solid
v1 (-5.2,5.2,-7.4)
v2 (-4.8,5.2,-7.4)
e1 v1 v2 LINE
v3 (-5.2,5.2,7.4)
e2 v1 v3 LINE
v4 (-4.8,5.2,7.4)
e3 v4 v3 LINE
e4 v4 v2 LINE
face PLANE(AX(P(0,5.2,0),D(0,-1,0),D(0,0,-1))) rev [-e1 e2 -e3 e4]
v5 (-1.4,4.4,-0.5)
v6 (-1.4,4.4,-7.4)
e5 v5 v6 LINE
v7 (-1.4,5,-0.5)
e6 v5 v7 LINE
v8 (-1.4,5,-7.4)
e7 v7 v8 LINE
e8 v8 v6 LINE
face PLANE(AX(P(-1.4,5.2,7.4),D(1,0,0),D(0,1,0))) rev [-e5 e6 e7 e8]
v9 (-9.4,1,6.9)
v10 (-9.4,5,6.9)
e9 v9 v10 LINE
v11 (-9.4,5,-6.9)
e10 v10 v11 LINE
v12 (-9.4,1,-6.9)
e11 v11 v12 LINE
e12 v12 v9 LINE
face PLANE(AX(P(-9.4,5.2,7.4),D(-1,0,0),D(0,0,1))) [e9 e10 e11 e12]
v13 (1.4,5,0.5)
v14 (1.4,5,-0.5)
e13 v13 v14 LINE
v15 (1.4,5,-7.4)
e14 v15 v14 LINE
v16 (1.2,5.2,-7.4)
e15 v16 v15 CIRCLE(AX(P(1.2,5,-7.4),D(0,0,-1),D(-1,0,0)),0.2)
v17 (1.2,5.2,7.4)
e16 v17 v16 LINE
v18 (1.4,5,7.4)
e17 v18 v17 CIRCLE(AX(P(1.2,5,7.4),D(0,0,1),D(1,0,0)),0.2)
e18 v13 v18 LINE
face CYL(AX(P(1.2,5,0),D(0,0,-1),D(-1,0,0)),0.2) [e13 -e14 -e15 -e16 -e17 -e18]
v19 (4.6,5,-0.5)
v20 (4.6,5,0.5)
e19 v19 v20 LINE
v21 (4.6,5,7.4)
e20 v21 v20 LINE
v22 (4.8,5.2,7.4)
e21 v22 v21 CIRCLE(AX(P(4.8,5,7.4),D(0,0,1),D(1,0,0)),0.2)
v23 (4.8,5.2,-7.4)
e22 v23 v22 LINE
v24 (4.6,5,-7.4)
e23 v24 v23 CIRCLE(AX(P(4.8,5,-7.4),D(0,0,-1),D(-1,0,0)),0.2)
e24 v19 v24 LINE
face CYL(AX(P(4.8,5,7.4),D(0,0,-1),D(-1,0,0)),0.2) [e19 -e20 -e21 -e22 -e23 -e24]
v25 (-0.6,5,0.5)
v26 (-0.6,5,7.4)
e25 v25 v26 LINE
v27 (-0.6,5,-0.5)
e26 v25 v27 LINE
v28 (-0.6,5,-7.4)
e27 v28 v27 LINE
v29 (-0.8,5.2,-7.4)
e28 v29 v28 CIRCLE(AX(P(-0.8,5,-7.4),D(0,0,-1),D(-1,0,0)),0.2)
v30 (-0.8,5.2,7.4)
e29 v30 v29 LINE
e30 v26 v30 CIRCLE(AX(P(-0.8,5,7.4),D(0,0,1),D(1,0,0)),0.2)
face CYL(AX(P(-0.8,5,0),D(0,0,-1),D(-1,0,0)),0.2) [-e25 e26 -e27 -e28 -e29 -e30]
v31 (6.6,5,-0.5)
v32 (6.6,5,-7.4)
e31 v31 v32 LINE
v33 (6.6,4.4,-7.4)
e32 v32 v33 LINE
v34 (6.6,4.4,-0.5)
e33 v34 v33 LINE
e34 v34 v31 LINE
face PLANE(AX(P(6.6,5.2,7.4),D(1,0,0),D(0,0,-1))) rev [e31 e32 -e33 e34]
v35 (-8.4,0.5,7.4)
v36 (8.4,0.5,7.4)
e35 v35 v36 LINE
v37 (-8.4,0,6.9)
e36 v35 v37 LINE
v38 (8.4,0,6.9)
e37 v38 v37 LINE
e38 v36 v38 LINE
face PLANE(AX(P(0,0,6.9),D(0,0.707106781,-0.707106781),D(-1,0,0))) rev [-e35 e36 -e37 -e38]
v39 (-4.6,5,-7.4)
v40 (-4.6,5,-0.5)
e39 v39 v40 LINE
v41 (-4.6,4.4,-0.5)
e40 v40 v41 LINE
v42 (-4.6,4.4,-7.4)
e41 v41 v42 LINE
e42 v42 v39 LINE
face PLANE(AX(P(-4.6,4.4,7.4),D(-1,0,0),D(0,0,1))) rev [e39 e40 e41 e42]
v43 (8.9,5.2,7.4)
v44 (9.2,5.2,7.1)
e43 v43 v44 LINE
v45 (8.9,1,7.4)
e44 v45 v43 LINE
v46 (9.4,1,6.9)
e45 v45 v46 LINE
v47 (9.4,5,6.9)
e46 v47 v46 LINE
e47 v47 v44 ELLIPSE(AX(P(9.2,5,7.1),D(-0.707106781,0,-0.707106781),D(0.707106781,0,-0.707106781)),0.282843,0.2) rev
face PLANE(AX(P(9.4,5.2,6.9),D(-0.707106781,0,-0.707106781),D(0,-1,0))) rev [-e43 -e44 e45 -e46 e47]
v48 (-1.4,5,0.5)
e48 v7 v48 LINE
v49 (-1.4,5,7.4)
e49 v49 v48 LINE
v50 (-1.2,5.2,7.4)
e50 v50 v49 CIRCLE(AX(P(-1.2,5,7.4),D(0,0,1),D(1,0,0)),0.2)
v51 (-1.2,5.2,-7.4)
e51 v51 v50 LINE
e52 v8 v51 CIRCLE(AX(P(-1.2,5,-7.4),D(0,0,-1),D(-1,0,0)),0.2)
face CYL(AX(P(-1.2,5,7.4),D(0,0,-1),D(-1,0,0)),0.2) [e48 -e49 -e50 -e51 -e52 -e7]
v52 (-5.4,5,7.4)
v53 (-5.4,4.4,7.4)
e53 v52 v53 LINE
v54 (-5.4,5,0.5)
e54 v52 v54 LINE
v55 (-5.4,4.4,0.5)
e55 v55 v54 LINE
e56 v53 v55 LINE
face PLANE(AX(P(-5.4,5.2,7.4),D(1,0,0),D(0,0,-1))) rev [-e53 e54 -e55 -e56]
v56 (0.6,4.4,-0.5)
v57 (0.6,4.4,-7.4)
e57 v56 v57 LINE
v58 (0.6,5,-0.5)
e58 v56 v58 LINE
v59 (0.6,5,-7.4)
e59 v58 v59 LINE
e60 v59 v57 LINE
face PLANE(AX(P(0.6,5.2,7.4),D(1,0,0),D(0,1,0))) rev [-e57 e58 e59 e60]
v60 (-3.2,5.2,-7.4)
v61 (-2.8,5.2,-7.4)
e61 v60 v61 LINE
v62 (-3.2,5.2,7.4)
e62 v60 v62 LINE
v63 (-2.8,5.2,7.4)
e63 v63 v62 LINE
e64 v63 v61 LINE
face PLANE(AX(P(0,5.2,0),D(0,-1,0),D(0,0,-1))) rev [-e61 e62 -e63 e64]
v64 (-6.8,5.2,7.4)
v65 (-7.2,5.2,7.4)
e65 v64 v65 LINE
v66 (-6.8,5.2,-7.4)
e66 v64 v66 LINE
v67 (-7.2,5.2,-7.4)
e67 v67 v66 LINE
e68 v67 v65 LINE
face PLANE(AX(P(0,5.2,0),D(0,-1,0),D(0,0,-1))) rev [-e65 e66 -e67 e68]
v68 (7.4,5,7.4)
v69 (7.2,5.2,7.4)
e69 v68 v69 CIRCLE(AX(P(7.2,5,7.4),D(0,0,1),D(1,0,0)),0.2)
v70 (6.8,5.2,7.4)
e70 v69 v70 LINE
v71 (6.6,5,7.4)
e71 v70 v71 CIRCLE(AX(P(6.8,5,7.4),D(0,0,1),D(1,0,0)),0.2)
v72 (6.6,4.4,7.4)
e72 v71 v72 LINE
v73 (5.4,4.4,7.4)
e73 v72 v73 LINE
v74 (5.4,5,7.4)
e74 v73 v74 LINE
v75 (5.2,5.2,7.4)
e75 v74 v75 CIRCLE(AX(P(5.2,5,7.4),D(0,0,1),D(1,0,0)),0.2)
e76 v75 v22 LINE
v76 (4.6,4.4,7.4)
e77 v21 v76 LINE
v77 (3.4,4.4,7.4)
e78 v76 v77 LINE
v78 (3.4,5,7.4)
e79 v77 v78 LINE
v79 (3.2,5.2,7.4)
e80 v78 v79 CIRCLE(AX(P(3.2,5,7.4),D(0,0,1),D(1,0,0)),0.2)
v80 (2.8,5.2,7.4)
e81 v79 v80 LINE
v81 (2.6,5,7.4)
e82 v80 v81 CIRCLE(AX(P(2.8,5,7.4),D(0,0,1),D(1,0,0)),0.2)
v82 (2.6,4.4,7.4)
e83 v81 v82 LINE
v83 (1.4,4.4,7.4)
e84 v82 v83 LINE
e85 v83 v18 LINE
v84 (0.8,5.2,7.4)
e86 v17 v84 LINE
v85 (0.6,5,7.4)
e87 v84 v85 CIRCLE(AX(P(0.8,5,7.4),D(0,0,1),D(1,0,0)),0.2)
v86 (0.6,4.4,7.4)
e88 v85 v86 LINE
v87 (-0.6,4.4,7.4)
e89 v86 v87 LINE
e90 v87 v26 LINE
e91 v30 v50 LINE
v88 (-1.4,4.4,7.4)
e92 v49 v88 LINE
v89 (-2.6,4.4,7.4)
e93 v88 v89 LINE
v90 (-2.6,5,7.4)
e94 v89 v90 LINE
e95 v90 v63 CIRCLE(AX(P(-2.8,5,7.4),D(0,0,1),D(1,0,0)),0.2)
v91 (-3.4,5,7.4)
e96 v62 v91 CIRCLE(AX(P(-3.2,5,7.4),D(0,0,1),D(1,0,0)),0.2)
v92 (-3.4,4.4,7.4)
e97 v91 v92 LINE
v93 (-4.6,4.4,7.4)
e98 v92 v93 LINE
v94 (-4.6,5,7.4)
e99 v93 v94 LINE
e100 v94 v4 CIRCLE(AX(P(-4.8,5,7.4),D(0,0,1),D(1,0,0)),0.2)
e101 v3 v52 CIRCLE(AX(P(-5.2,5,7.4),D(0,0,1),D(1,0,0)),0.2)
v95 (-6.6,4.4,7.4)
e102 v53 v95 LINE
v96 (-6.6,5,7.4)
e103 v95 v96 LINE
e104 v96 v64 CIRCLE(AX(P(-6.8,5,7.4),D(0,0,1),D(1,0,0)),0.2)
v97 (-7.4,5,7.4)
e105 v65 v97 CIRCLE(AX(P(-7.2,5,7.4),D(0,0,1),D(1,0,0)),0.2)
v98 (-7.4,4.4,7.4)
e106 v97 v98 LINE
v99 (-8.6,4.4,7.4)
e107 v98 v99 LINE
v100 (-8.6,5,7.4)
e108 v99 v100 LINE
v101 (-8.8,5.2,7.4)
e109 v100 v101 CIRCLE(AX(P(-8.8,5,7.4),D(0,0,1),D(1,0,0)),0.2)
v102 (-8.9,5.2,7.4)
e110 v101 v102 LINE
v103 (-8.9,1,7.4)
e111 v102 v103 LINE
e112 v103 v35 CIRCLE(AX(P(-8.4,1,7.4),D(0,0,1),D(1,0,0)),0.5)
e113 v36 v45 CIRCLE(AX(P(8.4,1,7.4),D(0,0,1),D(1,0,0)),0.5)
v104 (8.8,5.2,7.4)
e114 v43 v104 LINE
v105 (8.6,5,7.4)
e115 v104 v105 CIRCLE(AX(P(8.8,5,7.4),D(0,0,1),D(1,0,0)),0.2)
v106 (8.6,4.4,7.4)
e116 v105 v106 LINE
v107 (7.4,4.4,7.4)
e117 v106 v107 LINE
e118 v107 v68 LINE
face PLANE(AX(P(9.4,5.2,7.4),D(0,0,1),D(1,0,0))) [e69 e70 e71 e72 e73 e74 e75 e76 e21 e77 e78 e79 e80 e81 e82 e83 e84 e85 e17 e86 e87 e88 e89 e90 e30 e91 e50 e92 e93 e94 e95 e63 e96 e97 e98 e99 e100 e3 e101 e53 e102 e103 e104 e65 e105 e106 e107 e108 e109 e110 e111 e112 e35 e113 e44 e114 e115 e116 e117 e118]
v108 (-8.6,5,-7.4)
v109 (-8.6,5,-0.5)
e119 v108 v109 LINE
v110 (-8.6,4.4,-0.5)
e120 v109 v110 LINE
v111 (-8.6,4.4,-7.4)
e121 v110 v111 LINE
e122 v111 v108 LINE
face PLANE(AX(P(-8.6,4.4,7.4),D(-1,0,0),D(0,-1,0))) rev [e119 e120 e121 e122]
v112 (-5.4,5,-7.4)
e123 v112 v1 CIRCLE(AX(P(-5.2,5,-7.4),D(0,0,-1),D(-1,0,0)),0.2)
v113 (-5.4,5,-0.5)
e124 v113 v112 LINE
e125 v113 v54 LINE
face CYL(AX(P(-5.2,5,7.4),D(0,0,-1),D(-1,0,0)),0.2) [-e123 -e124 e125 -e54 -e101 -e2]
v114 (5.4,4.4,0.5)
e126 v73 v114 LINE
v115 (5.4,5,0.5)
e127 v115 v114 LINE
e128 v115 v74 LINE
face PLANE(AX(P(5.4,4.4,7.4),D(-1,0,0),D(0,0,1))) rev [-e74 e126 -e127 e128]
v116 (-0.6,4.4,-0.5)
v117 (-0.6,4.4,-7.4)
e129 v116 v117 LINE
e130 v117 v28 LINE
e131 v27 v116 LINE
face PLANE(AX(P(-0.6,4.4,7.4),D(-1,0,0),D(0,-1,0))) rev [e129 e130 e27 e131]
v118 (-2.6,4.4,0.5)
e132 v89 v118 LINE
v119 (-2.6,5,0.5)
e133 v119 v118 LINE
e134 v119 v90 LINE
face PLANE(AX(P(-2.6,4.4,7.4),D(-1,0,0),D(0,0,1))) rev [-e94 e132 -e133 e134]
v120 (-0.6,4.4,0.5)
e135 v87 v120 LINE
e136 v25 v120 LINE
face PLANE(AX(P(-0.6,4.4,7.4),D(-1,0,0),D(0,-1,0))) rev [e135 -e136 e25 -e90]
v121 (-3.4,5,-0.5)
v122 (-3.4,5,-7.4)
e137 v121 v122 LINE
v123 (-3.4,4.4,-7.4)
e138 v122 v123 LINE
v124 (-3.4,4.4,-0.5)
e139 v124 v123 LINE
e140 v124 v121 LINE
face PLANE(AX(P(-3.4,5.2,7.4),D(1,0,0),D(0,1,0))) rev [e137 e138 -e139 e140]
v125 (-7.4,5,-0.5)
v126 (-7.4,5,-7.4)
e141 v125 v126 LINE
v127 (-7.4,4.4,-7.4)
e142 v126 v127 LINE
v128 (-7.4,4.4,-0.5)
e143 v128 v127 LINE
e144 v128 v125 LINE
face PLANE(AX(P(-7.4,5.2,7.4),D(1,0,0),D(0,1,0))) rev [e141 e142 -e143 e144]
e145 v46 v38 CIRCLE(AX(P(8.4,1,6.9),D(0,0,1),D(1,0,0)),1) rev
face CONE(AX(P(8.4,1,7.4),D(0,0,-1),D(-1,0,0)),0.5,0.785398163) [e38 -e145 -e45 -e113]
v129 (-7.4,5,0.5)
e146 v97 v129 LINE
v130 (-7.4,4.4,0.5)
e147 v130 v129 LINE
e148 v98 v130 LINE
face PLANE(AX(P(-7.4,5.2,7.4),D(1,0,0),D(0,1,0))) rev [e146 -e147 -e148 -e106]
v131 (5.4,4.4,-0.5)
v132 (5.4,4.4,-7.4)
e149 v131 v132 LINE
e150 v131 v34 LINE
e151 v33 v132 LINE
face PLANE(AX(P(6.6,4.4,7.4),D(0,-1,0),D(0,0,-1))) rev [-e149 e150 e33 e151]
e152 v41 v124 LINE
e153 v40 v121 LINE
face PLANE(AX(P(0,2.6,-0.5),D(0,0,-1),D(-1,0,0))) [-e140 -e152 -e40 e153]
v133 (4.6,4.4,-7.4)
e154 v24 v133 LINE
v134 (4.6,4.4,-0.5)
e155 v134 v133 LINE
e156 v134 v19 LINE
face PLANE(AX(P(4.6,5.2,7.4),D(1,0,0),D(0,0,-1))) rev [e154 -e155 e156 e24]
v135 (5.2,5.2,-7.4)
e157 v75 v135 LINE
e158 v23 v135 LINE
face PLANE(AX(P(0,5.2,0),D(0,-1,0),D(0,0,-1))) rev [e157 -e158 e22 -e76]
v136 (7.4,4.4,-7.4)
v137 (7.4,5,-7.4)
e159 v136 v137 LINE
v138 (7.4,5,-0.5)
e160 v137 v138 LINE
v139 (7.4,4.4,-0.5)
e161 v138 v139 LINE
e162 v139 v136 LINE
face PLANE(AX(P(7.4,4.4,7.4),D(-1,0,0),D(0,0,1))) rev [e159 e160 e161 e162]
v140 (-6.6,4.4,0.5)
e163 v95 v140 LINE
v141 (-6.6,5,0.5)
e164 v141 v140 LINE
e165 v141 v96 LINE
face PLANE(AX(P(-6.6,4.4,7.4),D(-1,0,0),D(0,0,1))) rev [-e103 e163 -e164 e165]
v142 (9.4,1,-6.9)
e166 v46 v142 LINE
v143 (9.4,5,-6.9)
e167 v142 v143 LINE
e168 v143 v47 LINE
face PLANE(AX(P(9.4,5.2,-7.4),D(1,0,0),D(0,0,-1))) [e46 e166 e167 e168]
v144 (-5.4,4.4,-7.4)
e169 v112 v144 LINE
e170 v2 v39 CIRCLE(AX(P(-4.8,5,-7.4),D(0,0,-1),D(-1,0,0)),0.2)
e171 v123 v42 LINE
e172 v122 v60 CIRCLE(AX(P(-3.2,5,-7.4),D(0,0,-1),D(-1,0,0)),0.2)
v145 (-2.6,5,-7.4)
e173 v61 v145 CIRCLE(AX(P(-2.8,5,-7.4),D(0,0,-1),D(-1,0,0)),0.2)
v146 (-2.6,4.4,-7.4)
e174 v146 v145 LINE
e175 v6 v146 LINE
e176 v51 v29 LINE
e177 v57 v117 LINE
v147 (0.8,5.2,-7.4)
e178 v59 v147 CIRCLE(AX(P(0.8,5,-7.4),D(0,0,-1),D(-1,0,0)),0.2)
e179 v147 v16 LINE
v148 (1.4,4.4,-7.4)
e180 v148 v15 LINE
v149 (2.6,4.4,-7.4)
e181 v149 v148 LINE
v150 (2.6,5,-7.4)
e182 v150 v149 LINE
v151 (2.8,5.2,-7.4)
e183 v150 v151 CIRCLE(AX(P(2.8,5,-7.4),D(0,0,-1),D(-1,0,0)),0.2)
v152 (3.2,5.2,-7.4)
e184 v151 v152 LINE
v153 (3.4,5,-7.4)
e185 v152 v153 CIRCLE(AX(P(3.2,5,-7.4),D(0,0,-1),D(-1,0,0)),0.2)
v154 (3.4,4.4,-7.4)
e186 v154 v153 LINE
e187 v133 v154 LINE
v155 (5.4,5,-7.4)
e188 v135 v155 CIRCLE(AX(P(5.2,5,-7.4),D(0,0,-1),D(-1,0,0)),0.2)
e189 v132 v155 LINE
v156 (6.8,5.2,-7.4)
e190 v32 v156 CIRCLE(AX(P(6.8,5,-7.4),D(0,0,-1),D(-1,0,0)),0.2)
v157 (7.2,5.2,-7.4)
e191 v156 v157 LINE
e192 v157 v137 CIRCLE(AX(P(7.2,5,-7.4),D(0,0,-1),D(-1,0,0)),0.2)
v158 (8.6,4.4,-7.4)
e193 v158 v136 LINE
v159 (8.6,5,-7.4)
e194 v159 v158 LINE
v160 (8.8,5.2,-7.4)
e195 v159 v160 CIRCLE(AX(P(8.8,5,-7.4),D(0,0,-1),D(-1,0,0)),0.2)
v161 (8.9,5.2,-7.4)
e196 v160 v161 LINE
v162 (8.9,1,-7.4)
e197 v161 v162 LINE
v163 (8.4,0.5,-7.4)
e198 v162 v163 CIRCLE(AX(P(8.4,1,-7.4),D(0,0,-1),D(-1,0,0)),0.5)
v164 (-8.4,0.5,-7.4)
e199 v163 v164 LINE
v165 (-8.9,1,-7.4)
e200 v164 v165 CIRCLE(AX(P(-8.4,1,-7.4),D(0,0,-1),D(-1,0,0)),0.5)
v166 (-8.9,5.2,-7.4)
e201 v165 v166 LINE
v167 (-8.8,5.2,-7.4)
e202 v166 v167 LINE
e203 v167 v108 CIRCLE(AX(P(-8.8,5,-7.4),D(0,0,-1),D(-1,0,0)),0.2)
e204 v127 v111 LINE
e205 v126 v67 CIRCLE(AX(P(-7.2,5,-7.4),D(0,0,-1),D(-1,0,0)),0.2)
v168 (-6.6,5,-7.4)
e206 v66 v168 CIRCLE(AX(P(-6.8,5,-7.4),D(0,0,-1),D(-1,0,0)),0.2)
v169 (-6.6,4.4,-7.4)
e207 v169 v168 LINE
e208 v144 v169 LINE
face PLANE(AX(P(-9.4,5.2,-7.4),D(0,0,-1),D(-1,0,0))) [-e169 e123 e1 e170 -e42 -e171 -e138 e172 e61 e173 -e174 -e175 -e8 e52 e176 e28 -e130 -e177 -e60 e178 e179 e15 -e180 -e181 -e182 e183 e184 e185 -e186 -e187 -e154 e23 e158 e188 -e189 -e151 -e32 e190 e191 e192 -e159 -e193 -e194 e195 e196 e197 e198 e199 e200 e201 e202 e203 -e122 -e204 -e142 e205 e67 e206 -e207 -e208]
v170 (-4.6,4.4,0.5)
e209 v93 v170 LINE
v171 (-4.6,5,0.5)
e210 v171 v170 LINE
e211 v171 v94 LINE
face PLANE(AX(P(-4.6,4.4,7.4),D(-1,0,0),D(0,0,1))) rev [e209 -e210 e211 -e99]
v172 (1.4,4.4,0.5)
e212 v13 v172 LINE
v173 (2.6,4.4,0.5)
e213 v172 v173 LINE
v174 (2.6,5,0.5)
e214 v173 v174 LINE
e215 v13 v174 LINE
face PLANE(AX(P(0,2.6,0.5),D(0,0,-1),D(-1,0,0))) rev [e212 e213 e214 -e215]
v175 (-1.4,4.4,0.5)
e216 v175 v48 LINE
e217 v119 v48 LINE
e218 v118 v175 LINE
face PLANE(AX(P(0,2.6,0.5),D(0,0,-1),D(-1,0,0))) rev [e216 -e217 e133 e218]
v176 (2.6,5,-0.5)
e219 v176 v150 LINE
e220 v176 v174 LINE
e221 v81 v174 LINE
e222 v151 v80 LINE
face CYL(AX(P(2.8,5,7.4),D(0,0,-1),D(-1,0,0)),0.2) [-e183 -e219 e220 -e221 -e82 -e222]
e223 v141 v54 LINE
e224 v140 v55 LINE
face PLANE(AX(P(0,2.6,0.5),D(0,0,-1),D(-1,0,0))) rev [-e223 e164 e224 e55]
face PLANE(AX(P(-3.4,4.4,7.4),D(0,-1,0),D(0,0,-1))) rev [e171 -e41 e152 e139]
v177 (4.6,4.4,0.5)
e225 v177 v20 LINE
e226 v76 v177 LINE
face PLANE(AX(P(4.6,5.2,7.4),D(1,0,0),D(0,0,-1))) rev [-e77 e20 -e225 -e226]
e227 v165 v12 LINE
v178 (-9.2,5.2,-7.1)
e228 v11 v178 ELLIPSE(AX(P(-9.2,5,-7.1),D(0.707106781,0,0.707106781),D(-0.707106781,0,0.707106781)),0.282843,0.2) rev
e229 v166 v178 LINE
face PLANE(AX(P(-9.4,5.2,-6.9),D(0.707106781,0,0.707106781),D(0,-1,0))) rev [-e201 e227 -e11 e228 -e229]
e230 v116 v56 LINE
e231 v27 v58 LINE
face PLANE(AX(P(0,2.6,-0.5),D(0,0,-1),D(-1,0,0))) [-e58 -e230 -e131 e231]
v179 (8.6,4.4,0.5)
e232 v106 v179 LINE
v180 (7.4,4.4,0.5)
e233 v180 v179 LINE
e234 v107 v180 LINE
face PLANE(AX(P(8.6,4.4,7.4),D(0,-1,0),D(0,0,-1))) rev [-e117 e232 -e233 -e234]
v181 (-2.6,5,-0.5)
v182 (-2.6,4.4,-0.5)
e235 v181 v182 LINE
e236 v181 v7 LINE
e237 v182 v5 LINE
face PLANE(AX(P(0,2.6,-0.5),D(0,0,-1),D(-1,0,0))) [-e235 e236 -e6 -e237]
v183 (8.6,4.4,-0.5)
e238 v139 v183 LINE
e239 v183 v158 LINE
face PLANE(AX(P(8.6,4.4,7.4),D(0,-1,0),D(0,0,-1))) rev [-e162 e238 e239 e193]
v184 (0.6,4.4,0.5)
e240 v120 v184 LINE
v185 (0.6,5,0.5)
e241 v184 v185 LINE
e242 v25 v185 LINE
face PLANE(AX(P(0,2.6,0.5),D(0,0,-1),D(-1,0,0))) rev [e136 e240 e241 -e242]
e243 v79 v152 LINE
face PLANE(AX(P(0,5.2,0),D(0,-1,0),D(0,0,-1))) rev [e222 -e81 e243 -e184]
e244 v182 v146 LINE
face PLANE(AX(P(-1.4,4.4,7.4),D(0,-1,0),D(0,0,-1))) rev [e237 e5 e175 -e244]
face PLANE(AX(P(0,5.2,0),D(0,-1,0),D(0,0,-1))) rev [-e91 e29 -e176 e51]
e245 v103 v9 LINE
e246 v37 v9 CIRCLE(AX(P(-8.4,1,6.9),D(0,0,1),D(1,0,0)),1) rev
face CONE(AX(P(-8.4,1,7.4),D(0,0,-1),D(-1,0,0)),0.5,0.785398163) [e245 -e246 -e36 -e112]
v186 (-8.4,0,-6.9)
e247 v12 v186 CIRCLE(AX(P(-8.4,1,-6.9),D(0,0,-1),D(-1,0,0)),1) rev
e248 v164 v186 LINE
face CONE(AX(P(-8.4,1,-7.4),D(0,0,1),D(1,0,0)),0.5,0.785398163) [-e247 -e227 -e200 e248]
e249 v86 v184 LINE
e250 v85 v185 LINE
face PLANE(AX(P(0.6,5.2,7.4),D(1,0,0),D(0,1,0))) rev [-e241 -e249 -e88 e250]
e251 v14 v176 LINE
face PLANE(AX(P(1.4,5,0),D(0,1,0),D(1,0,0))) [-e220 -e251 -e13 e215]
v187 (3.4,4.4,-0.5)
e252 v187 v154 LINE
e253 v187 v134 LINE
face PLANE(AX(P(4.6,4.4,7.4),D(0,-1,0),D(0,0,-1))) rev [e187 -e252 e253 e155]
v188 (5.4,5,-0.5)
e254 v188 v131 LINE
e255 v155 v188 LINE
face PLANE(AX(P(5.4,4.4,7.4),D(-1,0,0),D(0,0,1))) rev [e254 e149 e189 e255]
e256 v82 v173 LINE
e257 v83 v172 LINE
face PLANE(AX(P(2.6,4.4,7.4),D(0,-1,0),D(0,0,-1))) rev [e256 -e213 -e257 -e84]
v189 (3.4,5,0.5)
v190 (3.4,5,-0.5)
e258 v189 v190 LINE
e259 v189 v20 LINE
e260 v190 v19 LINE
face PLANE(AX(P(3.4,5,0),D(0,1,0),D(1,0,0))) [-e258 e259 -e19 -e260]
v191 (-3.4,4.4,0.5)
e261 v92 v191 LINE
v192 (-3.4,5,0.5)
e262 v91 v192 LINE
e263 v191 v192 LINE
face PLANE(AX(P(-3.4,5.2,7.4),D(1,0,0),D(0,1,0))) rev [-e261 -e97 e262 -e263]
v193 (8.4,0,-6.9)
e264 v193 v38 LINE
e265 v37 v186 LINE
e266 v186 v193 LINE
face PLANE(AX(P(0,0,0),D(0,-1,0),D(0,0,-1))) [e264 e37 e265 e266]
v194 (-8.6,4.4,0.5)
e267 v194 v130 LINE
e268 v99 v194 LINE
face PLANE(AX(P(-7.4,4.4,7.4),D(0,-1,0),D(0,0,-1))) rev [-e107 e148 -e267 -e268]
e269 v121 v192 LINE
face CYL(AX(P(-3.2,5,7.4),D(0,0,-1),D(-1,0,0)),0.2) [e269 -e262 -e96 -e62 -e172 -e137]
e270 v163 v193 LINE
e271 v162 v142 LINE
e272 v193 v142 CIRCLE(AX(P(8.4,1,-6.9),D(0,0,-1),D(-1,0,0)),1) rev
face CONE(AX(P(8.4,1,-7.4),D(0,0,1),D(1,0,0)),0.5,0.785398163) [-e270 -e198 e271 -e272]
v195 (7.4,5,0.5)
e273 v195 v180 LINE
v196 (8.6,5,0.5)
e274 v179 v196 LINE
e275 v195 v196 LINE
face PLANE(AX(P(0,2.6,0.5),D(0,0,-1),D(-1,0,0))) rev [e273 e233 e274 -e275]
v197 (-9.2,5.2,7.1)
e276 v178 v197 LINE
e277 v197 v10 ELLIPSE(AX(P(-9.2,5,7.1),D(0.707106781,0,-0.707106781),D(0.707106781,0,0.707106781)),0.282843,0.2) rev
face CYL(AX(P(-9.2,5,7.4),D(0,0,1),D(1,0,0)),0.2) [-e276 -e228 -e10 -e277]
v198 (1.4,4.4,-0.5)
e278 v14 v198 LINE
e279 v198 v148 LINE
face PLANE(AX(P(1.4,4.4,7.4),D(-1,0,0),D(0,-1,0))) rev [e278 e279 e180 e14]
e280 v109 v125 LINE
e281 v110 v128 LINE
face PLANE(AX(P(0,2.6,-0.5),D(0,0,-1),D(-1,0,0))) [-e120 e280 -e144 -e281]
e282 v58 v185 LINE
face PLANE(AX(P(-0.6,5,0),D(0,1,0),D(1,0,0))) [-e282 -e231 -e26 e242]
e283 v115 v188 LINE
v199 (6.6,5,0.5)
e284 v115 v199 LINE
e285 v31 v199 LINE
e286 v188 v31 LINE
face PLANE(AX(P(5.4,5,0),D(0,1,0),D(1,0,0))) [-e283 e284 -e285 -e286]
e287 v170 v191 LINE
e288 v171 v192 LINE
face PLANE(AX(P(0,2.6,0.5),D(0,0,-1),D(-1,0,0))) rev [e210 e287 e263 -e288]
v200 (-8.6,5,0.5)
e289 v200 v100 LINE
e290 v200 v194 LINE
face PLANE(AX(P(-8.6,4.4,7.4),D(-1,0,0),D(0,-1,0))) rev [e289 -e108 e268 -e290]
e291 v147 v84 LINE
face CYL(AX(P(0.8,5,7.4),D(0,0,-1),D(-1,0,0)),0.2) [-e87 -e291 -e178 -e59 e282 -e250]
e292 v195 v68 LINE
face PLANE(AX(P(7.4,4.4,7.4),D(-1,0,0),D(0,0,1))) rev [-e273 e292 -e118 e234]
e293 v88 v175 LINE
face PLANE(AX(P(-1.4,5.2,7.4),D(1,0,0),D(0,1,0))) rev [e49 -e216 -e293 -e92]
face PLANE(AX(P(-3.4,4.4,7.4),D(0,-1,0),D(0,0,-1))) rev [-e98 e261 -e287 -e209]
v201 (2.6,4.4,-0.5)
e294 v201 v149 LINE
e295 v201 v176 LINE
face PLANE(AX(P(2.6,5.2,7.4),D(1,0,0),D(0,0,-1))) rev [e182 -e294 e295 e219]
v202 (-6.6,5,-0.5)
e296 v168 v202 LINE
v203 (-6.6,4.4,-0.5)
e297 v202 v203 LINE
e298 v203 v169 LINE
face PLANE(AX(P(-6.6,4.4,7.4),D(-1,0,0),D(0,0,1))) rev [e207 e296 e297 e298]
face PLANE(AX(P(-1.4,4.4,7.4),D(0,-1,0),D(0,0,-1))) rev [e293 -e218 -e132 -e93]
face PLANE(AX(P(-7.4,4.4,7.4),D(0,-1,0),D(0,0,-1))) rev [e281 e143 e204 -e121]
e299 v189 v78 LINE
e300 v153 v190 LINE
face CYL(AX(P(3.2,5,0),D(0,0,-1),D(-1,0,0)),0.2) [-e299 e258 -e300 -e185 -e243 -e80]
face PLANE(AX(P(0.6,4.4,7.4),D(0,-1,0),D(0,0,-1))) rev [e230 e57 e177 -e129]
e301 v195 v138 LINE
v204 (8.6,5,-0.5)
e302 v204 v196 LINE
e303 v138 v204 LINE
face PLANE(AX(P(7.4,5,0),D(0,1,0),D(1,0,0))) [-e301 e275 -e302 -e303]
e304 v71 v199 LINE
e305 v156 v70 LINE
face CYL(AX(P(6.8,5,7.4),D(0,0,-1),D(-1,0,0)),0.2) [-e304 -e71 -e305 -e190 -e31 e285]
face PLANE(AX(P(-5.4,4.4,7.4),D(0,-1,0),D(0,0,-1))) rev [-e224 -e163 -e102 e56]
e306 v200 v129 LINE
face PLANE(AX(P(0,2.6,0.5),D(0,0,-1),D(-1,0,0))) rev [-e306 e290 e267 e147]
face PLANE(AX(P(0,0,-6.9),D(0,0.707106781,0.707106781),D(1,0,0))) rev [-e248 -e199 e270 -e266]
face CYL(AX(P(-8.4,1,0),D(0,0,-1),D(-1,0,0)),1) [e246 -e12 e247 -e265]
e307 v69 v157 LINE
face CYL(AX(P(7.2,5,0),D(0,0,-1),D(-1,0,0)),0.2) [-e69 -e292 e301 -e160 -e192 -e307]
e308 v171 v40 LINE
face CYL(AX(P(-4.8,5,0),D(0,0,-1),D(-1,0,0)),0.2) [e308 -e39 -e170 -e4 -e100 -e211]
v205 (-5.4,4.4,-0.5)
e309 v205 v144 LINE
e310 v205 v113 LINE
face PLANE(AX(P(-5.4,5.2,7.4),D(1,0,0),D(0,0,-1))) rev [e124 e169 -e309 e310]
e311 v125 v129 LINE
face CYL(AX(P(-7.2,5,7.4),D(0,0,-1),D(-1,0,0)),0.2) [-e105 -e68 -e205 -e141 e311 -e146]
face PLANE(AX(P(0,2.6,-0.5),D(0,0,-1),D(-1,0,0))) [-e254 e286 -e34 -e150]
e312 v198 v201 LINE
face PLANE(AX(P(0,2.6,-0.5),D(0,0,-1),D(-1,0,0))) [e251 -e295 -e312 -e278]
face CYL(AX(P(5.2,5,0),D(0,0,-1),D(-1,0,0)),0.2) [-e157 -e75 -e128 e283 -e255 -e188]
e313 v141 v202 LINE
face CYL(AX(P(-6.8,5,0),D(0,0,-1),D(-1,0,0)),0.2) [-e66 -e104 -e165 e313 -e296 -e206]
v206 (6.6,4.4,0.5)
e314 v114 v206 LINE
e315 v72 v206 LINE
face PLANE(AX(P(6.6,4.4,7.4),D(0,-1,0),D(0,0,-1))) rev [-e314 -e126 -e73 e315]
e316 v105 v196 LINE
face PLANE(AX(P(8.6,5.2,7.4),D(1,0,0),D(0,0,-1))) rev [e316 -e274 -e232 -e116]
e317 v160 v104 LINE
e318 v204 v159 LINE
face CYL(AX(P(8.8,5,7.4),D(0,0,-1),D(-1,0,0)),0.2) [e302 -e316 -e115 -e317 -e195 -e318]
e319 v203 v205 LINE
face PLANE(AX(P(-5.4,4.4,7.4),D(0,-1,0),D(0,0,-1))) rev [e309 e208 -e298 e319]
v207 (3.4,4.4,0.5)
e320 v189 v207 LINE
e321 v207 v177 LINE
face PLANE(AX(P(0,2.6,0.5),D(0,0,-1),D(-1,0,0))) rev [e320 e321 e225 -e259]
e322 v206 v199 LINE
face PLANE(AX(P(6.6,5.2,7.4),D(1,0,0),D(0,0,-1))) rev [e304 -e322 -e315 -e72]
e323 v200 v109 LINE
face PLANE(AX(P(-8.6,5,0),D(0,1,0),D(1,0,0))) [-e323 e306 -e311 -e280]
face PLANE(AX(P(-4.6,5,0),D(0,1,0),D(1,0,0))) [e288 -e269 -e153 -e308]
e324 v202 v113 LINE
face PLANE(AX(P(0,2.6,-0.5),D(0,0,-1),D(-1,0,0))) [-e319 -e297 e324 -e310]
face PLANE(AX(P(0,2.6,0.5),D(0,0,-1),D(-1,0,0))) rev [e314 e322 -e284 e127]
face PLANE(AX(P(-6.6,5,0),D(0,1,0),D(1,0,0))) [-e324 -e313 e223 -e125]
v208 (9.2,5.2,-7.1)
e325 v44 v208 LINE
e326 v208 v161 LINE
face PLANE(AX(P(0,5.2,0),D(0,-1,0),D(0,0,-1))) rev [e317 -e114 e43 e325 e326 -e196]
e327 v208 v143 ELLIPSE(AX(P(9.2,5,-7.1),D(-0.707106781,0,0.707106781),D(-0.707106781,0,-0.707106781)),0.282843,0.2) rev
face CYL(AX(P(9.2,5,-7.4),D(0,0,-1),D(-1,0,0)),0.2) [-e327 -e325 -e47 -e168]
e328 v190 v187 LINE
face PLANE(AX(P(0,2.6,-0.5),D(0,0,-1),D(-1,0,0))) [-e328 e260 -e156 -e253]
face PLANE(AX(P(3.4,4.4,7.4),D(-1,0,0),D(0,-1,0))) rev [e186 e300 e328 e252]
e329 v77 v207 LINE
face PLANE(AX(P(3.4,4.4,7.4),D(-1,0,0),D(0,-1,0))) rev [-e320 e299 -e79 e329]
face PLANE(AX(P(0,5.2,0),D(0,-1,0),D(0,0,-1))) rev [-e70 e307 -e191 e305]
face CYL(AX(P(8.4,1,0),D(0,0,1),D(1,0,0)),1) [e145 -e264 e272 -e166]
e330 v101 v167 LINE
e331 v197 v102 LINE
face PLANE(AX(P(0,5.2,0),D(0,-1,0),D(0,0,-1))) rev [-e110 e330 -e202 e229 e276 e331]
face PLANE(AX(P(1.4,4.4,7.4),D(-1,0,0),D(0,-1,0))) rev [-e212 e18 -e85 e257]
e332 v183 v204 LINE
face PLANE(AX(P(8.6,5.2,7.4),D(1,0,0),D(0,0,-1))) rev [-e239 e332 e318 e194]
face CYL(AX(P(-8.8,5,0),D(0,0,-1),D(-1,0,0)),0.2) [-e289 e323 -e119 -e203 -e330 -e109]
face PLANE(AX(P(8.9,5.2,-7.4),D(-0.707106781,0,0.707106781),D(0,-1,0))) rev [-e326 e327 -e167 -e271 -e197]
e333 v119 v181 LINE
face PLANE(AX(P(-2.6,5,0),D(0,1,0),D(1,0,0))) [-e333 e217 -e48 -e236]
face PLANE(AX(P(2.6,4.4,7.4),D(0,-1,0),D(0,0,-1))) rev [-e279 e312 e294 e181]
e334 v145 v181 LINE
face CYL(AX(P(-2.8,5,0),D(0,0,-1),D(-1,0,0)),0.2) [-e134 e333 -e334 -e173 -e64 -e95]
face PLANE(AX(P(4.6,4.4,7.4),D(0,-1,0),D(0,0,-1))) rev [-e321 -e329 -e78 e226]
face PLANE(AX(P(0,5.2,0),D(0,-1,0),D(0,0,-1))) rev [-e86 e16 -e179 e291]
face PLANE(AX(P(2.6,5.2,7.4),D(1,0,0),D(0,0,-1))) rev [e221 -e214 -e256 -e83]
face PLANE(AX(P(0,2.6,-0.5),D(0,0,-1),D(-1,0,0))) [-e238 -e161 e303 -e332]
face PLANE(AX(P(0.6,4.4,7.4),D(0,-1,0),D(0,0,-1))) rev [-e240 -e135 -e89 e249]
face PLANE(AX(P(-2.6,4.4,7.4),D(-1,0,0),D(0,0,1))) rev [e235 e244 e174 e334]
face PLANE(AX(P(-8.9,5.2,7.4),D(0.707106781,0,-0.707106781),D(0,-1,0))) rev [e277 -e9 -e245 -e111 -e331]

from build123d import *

# Parameters (mm, degrees)
SKETCH1_W           = 18.8
SKETCH1_H           = 14.8
BOSS_EXTRUDE1_DEPTH = 5.2
SKETCH2_W           = 1.2
SKETCH2_H           = 0.8
CUT_EXTRUDE1_DEPTH  = 19.287700785
SKETCH3_W           = 1.2
SKETCH3_H           = 0.8
CUT_EXTRUDE2_DEPTH  = 19.287700785
SKETCH4_W           = 1.2
SKETCH4_H           = 0.8
CUT_EXTRUDE3_DEPTH  = 19.287700785
SKETCH5_W           = 1.2
SKETCH5_H           = 0.8
CUT_EXTRUDE4_DEPTH  = 19.287700785
SKETCH6_W           = 1.2
SKETCH6_H           = 0.8
CUT_EXTRUDE5_DEPTH  = 19.287700785
SKETCH7_W           = 1.2
SKETCH7_H           = 0.8
CUT_EXTRUDE6_DEPTH  = 19.287700785
SKETCH8_W           = 1.2
SKETCH8_H           = 0.8
CUT_EXTRUDE7_DEPTH  = 19.287700785
SKETCH9_W           = 1.2
SKETCH9_H           = 0.8
CUT_EXTRUDE8_DEPTH  = 19.287700785
SKETCH10_W          = 1.2
SKETCH10_H          = 0.8
CUT_EXTRUDE9_DEPTH  = 19.287700785
RIB1_REACH          = 15.045
SKETCH11_WALL_W     = 29.289078174
SKETCH11_WALL_H     = 1
RIB2_REACH          = 15.045
SKETCH12_WALL_W     = 29.289078174
SKETCH12_WALL_H     = 1
RIB3_REACH          = 15.045
SKETCH13_WALL_W     = 29.289078174
SKETCH13_WALL_H     = 1
RIB4_REACH          = 15.045
SKETCH14_WALL_W     = 29.289078174
SKETCH14_WALL_H     = 1
RIB5_REACH          = 15.045
SKETCH15_WALL_W     = 29.289078174
SKETCH15_WALL_H     = 1
RIB6_REACH          = 15.045
SKETCH16_WALL_W     = 29.289078174
SKETCH16_WALL_H     = 1
RIB7_REACH          = 15.045
SKETCH17_WALL_W     = 29.289078174
SKETCH17_WALL_H     = 1
RIB8_REACH          = 15.045
SKETCH18_WALL_W     = 29.289078174
SKETCH18_WALL_H     = 1
RIB9_REACH          = 15.045
SKETCH19_WALL_W     = 29.289078174
SKETCH19_WALL_H     = 1
FILLET1_R           = 1
CHAMFER1_SIZE       = 0.5
FILLET2_START       = -8
FILLET2_DEPTH       = 16


with BuildPart() as part:
    # Sketch1 → Boss-Extrude1 (new body)
    with BuildSketch(Plane.XZ):
        Rectangle(SKETCH1_W, SKETCH1_H)
    extrude(amount=-BOSS_EXTRUDE1_DEPTH)

    # Sketch2 → Cut-Extrude1 (cut, through all)
    with BuildSketch(Plane(origin=(0, 0, -7.4), x_dir=(-1, 0, 0), z_dir=(0, 0, -1))):
        with Locations((-8, 4.8)):
            Rectangle(SKETCH2_W, SKETCH2_H)
    extrude(amount=-CUT_EXTRUDE1_DEPTH, mode=Mode.SUBTRACT)

    # Sketch3 → Cut-Extrude2 (cut, through all)
    with BuildSketch(Plane(origin=(0, 0, -7.4), x_dir=(-1, 0, 0), z_dir=(0, 0, -1))):
        with Locations((-6, 4.8)):
            Rectangle(SKETCH3_W, SKETCH3_H)
    extrude(amount=-CUT_EXTRUDE2_DEPTH, mode=Mode.SUBTRACT)

    # Sketch4 → Cut-Extrude3 (cut, through all)
    with BuildSketch(Plane(origin=(0, 0, -7.4), x_dir=(-1, 0, 0), z_dir=(0, 0, -1))):
        with Locations((-4, 4.8)):
            Rectangle(SKETCH4_W, SKETCH4_H)
    extrude(amount=-CUT_EXTRUDE3_DEPTH, mode=Mode.SUBTRACT)

    # Sketch5 → Cut-Extrude4 (cut, through all)
    with BuildSketch(Plane(origin=(0, 0, -7.4), x_dir=(-1, 0, 0), z_dir=(0, 0, -1))):
        with Locations((-2, 4.8)):
            Rectangle(SKETCH5_W, SKETCH5_H)
    extrude(amount=-CUT_EXTRUDE4_DEPTH, mode=Mode.SUBTRACT)

    # Sketch6 → Cut-Extrude5 (cut, through all)
    with BuildSketch(Plane(origin=(0, 0, -7.4), x_dir=(-1, 0, 0), z_dir=(0, 0, -1))):
        with Locations((0, 4.8)):
            Rectangle(SKETCH6_W, SKETCH6_H)
    extrude(amount=-CUT_EXTRUDE5_DEPTH, mode=Mode.SUBTRACT)

    # Sketch7 → Cut-Extrude6 (cut, through all)
    with BuildSketch(Plane(origin=(0, 0, -7.4), x_dir=(-1, 0, 0), z_dir=(0, 0, -1))):
        with Locations((2, 4.8)):
            Rectangle(SKETCH7_W, SKETCH7_H)
    extrude(amount=-CUT_EXTRUDE6_DEPTH, mode=Mode.SUBTRACT)

    # Sketch8 → Cut-Extrude7 (cut, through all)
    with BuildSketch(Plane(origin=(0, 0, -7.4), x_dir=(-1, 0, 0), z_dir=(0, 0, -1))):
        with Locations((4, 4.8)):
            Rectangle(SKETCH8_W, SKETCH8_H)
    extrude(amount=-CUT_EXTRUDE7_DEPTH, mode=Mode.SUBTRACT)

    # Sketch9 → Cut-Extrude8 (cut, through all)
    with BuildSketch(Plane(origin=(0, 0, -7.4), x_dir=(-1, 0, 0), z_dir=(0, 0, -1))):
        with Locations((6, 4.8)):
            Rectangle(SKETCH9_W, SKETCH9_H)
    extrude(amount=-CUT_EXTRUDE8_DEPTH, mode=Mode.SUBTRACT)

    # Sketch10 → Cut-Extrude9 (cut, through all)
    with BuildSketch(Plane(origin=(0, 0, -7.4), x_dir=(-1, 0, 0), z_dir=(0, 0, -1))):
        with Locations((8, 4.8)):
            Rectangle(SKETCH10_W, SKETCH10_H)
    extrude(amount=-CUT_EXTRUDE9_DEPTH, mode=Mode.SUBTRACT)

    # Sketch11 wall → Rib1 (add, up to next)
    with BuildSketch(Plane(origin=(4, 5, 0), x_dir=(1, 0, 0), z_dir=(0, -1, 0)), mode=Mode.PRIVATE) as rib1_sk1:
        Rectangle(SKETCH11_WALL_W, SKETCH11_WALL_H)
    rib1_tool1 = extrude(rib1_sk1.sketch, amount=RIB1_REACH, mode=Mode.PRIVATE) - part.part
    add(rib1_tool1.solids().sort_by_distance((4, 5, 0))[0])

    # Sketch12 wall → Rib2 (add, up to next)
    with BuildSketch(Plane(origin=(-4, 5, 0), x_dir=(1, 0, 0), z_dir=(0, -1, 0)), mode=Mode.PRIVATE) as rib2_sk1:
        Rectangle(SKETCH12_WALL_W, SKETCH12_WALL_H)
    rib2_tool1 = extrude(rib2_sk1.sketch, amount=RIB2_REACH, mode=Mode.PRIVATE) - part.part
    add(rib2_tool1.solids().sort_by_distance((-4, 5, 0))[0])

    # Sketch13 wall → Rib3 (add, up to next)
    with BuildSketch(Plane(origin=(-8, 5, 0), x_dir=(1, 0, 0), z_dir=(0, -1, 0)), mode=Mode.PRIVATE) as rib3_sk1:
        Rectangle(SKETCH13_WALL_W, SKETCH13_WALL_H)
    rib3_tool1 = extrude(rib3_sk1.sketch, amount=RIB3_REACH, mode=Mode.PRIVATE) - part.part
    add(rib3_tool1.solids().sort_by_distance((-8, 5, 0))[0])

    # Sketch14 wall → Rib4 (add, up to next)
    with BuildSketch(Plane(origin=(8, 5, 0), x_dir=(1, 0, 0), z_dir=(0, -1, 0)), mode=Mode.PRIVATE) as rib4_sk1:
        Rectangle(SKETCH14_WALL_W, SKETCH14_WALL_H)
    rib4_tool1 = extrude(rib4_sk1.sketch, amount=RIB4_REACH, mode=Mode.PRIVATE) - part.part
    add(rib4_tool1.solids().sort_by_distance((8, 5, 0))[0])

    # Sketch15 wall → Rib5 (add, up to next)
    with BuildSketch(Plane(origin=(2, 5, 0), x_dir=(1, 0, 0), z_dir=(0, -1, 0)), mode=Mode.PRIVATE) as rib5_sk1:
        Rectangle(SKETCH15_WALL_W, SKETCH15_WALL_H)
    rib5_tool1 = extrude(rib5_sk1.sketch, amount=RIB5_REACH, mode=Mode.PRIVATE) - part.part
    add(rib5_tool1.solids().sort_by_distance((2, 5, 0))[0])

    # Sketch16 wall → Rib6 (add, up to next)
    with BuildSketch(Plane(origin=(-2, 5, 0), x_dir=(1, 0, 0), z_dir=(0, -1, 0)), mode=Mode.PRIVATE) as rib6_sk1:
        Rectangle(SKETCH16_WALL_W, SKETCH16_WALL_H)
    rib6_tool1 = extrude(rib6_sk1.sketch, amount=RIB6_REACH, mode=Mode.PRIVATE) - part.part
    add(rib6_tool1.solids().sort_by_distance((-2, 5, 0))[0])

    # Sketch17 wall → Rib7 (add, up to next)
    with BuildSketch(Plane(origin=(6, 5, 0), x_dir=(1, 0, 0), z_dir=(0, -1, 0)), mode=Mode.PRIVATE) as rib7_sk1:
        Rectangle(SKETCH17_WALL_W, SKETCH17_WALL_H)
    rib7_tool1 = extrude(rib7_sk1.sketch, amount=RIB7_REACH, mode=Mode.PRIVATE) - part.part
    add(rib7_tool1.solids().sort_by_distance((6, 5, 0))[0])

    # Sketch18 wall → Rib8 (add, up to next)
    with BuildSketch(Plane.XZ.offset(-5), mode=Mode.PRIVATE) as rib8_sk1:
        Rectangle(SKETCH18_WALL_W, SKETCH18_WALL_H)
    rib8_tool1 = extrude(rib8_sk1.sketch, amount=RIB8_REACH, mode=Mode.PRIVATE) - part.part
    add(rib8_tool1.solids().sort_by_distance((0, 5, 0))[0])

    # Sketch19 wall → Rib9 (add, up to next)
    with BuildSketch(Plane(origin=(-6, 5, 0), x_dir=(1, 0, 0), z_dir=(0, -1, 0)), mode=Mode.PRIVATE) as rib9_sk1:
        Rectangle(SKETCH19_WALL_W, SKETCH19_WALL_H)
    rib9_tool1 = extrude(rib9_sk1.sketch, amount=RIB9_REACH, mode=Mode.PRIVATE) - part.part
    add(rib9_tool1.solids().sort_by_distance((-6, 5, 0))[0])

    # Fillet1
    fillet1_edges = [part.edges().sort_by_distance(p)[0] for p in [
        (9.4, 0, 0),
        (-9.4, 0, 0),
    ]]
    fillet(fillet1_edges, radius=FILLET1_R)

    # Chamfer1
    chamfer1_edges = [part.edges().sort_by_distance(p)[0] for p in [
        (-9.4, 3.1, 7.4),
        (9.4, 3.1, 7.4),
        (9.4, 3.1, -7.4),
        (-9.4, 3.1, -7.4),
        (0, 0, -7.4),
        (0, 0, 7.4),
        (-9.107106781, 0.292893219, 7.4),
        (9.107106781, 0.292893219, 7.4),
        (-9.107106781, 0.292893219, -7.4),
        (9.107106781, 0.292893219, -7.4),
    ]]
    chamfer(chamfer1_edges, length=CHAMFER1_SIZE)

    # Fillet2: read off the stored shape, not the designer's step
    # Fillet2 outline → Fillet2 (cut)
    with BuildSketch(Plane.XY.offset(FILLET2_START)):
        with BuildLine():
            Line((7.4, 5.2), (7.2, 5.2))
            ThreePointArc((7.2, 5.2), (7.341421356, 5.141421356), (7.4, 5))
            Line((7.4, 5), (7.4, 5.2))
        make_face()
        with BuildLine():
            ThreePointArc((6.6, 5), (6.658578644, 5.141421356), (6.8, 5.2))
            Line((6.8, 5.2), (6.6, 5.2))
            Line((6.6, 5.2), (6.6, 5))
        make_face()
        with BuildLine():
            Line((3.4, 5.2), (3.2, 5.2))
            ThreePointArc((3.2, 5.2), (3.341421356, 5.141421356), (3.4, 5))
            Line((3.4, 5), (3.4, 5.2))
        make_face()
        with BuildLine():
            ThreePointArc((2.6, 5), (2.658578644, 5.141421356), (2.8, 5.2))
            Line((2.8, 5.2), (2.6, 5.2))
            Line((2.6, 5.2), (2.6, 5))
        make_face()
        with BuildLine():
            Line((1.4, 5.2), (1.2, 5.2))
            ThreePointArc((1.2, 5.2), (1.341421356, 5.141421356), (1.4, 5))
            Line((1.4, 5), (1.4, 5.2))
        make_face()
        with BuildLine():
            ThreePointArc((0.6, 5), (0.658578644, 5.141421356), (0.8, 5.2))
            Line((0.8, 5.2), (0.6, 5.2))
            Line((0.6, 5.2), (0.6, 5))
        make_face()
        with BuildLine():
            Line((-7.4, 5.2), (-7.4, 5))
            ThreePointArc((-7.4, 5), (-7.341421356, 5.141421356), (-7.2, 5.2))
            Line((-7.2, 5.2), (-7.4, 5.2))
        make_face()
        with BuildLine():
            Line((-6.6, 5.2), (-6.8, 5.2))
            ThreePointArc((-6.8, 5.2), (-6.658578644, 5.141421356), (-6.6, 5))
            Line((-6.6, 5), (-6.6, 5.2))
        make_face()
        with BuildLine():
            Line((5.4, 5.2), (5.2, 5.2))
            ThreePointArc((5.2, 5.2), (5.341421356, 5.141421356), (5.4, 5))
            Line((5.4, 5), (5.4, 5.2))
        make_face()
        with BuildLine():
            ThreePointArc((4.6, 5), (4.658578644, 5.141421356), (4.8, 5.2))
            Line((4.8, 5.2), (4.6, 5.2))
            Line((4.6, 5.2), (4.6, 5))
        make_face()
        with BuildLine():
            Line((-8.6, 5.2), (-8.8, 5.2))
            ThreePointArc((-8.8, 5.2), (-8.658578644, 5.141421356), (-8.6, 5))
            Line((-8.6, 5), (-8.6, 5.2))
        make_face()
        with BuildLine():
            ThreePointArc((-9.4, 5), (-9.341421356, 5.141421356), (-9.2, 5.2))
            Line((-9.2, 5.2), (-9.4, 5.2))
            Line((-9.4, 5.2), (-9.4, 5))
        make_face()
        with BuildLine():
            Line((-5.4, 5.2), (-5.4, 5))
            ThreePointArc((-5.4, 5), (-5.341421356, 5.141421356), (-5.2, 5.2))
            Line((-5.2, 5.2), (-5.4, 5.2))
        make_face()
        with BuildLine():
            Line((-4.6, 5.2), (-4.8, 5.2))
            ThreePointArc((-4.8, 5.2), (-4.658578644, 5.141421356), (-4.6, 5))
            Line((-4.6, 5), (-4.6, 5.2))
        make_face()
        with BuildLine():
            Line((-3.4, 5.2), (-3.4, 5))
            ThreePointArc((-3.4, 5), (-3.341421356, 5.141421356), (-3.2, 5.2))
            Line((-3.2, 5.2), (-3.4, 5.2))
        make_face()
        with BuildLine():
            Line((-2.6, 5.2), (-2.8, 5.2))
            ThreePointArc((-2.8, 5.2), (-2.658578644, 5.141421356), (-2.6, 5))
            Line((-2.6, 5), (-2.6, 5.2))
        make_face()
        with BuildLine():
            Line((-1.4, 5.2), (-1.4, 5))
            ThreePointArc((-1.4, 5), (-1.341421356, 5.141421356), (-1.2, 5.2))
            Line((-1.2, 5.2), (-1.4, 5.2))
        make_face()
        with BuildLine():
            Line((-0.6, 5.2), (-0.8, 5.2))
            ThreePointArc((-0.8, 5.2), (-0.658578644, 5.141421356), (-0.6, 5))
            Line((-0.6, 5), (-0.6, 5.2))
        make_face()
        with BuildLine():
            Line((8.6, 5.2), (8.6, 5))
            ThreePointArc((8.6, 5), (8.658578644, 5.141421356), (8.8, 5.2))
            Line((8.8, 5.2), (8.6, 5.2))
        make_face()
        with BuildLine():
            Line((9.4, 5.2), (9.2, 5.2))
            ThreePointArc((9.2, 5.2), (9.341421356, 5.141421356), (9.4, 5))
            Line((9.4, 5), (9.4, 5.2))
        make_face()
    extrude(amount=FILLET2_DEPTH, mode=Mode.SUBTRACT)


solid = part.part
